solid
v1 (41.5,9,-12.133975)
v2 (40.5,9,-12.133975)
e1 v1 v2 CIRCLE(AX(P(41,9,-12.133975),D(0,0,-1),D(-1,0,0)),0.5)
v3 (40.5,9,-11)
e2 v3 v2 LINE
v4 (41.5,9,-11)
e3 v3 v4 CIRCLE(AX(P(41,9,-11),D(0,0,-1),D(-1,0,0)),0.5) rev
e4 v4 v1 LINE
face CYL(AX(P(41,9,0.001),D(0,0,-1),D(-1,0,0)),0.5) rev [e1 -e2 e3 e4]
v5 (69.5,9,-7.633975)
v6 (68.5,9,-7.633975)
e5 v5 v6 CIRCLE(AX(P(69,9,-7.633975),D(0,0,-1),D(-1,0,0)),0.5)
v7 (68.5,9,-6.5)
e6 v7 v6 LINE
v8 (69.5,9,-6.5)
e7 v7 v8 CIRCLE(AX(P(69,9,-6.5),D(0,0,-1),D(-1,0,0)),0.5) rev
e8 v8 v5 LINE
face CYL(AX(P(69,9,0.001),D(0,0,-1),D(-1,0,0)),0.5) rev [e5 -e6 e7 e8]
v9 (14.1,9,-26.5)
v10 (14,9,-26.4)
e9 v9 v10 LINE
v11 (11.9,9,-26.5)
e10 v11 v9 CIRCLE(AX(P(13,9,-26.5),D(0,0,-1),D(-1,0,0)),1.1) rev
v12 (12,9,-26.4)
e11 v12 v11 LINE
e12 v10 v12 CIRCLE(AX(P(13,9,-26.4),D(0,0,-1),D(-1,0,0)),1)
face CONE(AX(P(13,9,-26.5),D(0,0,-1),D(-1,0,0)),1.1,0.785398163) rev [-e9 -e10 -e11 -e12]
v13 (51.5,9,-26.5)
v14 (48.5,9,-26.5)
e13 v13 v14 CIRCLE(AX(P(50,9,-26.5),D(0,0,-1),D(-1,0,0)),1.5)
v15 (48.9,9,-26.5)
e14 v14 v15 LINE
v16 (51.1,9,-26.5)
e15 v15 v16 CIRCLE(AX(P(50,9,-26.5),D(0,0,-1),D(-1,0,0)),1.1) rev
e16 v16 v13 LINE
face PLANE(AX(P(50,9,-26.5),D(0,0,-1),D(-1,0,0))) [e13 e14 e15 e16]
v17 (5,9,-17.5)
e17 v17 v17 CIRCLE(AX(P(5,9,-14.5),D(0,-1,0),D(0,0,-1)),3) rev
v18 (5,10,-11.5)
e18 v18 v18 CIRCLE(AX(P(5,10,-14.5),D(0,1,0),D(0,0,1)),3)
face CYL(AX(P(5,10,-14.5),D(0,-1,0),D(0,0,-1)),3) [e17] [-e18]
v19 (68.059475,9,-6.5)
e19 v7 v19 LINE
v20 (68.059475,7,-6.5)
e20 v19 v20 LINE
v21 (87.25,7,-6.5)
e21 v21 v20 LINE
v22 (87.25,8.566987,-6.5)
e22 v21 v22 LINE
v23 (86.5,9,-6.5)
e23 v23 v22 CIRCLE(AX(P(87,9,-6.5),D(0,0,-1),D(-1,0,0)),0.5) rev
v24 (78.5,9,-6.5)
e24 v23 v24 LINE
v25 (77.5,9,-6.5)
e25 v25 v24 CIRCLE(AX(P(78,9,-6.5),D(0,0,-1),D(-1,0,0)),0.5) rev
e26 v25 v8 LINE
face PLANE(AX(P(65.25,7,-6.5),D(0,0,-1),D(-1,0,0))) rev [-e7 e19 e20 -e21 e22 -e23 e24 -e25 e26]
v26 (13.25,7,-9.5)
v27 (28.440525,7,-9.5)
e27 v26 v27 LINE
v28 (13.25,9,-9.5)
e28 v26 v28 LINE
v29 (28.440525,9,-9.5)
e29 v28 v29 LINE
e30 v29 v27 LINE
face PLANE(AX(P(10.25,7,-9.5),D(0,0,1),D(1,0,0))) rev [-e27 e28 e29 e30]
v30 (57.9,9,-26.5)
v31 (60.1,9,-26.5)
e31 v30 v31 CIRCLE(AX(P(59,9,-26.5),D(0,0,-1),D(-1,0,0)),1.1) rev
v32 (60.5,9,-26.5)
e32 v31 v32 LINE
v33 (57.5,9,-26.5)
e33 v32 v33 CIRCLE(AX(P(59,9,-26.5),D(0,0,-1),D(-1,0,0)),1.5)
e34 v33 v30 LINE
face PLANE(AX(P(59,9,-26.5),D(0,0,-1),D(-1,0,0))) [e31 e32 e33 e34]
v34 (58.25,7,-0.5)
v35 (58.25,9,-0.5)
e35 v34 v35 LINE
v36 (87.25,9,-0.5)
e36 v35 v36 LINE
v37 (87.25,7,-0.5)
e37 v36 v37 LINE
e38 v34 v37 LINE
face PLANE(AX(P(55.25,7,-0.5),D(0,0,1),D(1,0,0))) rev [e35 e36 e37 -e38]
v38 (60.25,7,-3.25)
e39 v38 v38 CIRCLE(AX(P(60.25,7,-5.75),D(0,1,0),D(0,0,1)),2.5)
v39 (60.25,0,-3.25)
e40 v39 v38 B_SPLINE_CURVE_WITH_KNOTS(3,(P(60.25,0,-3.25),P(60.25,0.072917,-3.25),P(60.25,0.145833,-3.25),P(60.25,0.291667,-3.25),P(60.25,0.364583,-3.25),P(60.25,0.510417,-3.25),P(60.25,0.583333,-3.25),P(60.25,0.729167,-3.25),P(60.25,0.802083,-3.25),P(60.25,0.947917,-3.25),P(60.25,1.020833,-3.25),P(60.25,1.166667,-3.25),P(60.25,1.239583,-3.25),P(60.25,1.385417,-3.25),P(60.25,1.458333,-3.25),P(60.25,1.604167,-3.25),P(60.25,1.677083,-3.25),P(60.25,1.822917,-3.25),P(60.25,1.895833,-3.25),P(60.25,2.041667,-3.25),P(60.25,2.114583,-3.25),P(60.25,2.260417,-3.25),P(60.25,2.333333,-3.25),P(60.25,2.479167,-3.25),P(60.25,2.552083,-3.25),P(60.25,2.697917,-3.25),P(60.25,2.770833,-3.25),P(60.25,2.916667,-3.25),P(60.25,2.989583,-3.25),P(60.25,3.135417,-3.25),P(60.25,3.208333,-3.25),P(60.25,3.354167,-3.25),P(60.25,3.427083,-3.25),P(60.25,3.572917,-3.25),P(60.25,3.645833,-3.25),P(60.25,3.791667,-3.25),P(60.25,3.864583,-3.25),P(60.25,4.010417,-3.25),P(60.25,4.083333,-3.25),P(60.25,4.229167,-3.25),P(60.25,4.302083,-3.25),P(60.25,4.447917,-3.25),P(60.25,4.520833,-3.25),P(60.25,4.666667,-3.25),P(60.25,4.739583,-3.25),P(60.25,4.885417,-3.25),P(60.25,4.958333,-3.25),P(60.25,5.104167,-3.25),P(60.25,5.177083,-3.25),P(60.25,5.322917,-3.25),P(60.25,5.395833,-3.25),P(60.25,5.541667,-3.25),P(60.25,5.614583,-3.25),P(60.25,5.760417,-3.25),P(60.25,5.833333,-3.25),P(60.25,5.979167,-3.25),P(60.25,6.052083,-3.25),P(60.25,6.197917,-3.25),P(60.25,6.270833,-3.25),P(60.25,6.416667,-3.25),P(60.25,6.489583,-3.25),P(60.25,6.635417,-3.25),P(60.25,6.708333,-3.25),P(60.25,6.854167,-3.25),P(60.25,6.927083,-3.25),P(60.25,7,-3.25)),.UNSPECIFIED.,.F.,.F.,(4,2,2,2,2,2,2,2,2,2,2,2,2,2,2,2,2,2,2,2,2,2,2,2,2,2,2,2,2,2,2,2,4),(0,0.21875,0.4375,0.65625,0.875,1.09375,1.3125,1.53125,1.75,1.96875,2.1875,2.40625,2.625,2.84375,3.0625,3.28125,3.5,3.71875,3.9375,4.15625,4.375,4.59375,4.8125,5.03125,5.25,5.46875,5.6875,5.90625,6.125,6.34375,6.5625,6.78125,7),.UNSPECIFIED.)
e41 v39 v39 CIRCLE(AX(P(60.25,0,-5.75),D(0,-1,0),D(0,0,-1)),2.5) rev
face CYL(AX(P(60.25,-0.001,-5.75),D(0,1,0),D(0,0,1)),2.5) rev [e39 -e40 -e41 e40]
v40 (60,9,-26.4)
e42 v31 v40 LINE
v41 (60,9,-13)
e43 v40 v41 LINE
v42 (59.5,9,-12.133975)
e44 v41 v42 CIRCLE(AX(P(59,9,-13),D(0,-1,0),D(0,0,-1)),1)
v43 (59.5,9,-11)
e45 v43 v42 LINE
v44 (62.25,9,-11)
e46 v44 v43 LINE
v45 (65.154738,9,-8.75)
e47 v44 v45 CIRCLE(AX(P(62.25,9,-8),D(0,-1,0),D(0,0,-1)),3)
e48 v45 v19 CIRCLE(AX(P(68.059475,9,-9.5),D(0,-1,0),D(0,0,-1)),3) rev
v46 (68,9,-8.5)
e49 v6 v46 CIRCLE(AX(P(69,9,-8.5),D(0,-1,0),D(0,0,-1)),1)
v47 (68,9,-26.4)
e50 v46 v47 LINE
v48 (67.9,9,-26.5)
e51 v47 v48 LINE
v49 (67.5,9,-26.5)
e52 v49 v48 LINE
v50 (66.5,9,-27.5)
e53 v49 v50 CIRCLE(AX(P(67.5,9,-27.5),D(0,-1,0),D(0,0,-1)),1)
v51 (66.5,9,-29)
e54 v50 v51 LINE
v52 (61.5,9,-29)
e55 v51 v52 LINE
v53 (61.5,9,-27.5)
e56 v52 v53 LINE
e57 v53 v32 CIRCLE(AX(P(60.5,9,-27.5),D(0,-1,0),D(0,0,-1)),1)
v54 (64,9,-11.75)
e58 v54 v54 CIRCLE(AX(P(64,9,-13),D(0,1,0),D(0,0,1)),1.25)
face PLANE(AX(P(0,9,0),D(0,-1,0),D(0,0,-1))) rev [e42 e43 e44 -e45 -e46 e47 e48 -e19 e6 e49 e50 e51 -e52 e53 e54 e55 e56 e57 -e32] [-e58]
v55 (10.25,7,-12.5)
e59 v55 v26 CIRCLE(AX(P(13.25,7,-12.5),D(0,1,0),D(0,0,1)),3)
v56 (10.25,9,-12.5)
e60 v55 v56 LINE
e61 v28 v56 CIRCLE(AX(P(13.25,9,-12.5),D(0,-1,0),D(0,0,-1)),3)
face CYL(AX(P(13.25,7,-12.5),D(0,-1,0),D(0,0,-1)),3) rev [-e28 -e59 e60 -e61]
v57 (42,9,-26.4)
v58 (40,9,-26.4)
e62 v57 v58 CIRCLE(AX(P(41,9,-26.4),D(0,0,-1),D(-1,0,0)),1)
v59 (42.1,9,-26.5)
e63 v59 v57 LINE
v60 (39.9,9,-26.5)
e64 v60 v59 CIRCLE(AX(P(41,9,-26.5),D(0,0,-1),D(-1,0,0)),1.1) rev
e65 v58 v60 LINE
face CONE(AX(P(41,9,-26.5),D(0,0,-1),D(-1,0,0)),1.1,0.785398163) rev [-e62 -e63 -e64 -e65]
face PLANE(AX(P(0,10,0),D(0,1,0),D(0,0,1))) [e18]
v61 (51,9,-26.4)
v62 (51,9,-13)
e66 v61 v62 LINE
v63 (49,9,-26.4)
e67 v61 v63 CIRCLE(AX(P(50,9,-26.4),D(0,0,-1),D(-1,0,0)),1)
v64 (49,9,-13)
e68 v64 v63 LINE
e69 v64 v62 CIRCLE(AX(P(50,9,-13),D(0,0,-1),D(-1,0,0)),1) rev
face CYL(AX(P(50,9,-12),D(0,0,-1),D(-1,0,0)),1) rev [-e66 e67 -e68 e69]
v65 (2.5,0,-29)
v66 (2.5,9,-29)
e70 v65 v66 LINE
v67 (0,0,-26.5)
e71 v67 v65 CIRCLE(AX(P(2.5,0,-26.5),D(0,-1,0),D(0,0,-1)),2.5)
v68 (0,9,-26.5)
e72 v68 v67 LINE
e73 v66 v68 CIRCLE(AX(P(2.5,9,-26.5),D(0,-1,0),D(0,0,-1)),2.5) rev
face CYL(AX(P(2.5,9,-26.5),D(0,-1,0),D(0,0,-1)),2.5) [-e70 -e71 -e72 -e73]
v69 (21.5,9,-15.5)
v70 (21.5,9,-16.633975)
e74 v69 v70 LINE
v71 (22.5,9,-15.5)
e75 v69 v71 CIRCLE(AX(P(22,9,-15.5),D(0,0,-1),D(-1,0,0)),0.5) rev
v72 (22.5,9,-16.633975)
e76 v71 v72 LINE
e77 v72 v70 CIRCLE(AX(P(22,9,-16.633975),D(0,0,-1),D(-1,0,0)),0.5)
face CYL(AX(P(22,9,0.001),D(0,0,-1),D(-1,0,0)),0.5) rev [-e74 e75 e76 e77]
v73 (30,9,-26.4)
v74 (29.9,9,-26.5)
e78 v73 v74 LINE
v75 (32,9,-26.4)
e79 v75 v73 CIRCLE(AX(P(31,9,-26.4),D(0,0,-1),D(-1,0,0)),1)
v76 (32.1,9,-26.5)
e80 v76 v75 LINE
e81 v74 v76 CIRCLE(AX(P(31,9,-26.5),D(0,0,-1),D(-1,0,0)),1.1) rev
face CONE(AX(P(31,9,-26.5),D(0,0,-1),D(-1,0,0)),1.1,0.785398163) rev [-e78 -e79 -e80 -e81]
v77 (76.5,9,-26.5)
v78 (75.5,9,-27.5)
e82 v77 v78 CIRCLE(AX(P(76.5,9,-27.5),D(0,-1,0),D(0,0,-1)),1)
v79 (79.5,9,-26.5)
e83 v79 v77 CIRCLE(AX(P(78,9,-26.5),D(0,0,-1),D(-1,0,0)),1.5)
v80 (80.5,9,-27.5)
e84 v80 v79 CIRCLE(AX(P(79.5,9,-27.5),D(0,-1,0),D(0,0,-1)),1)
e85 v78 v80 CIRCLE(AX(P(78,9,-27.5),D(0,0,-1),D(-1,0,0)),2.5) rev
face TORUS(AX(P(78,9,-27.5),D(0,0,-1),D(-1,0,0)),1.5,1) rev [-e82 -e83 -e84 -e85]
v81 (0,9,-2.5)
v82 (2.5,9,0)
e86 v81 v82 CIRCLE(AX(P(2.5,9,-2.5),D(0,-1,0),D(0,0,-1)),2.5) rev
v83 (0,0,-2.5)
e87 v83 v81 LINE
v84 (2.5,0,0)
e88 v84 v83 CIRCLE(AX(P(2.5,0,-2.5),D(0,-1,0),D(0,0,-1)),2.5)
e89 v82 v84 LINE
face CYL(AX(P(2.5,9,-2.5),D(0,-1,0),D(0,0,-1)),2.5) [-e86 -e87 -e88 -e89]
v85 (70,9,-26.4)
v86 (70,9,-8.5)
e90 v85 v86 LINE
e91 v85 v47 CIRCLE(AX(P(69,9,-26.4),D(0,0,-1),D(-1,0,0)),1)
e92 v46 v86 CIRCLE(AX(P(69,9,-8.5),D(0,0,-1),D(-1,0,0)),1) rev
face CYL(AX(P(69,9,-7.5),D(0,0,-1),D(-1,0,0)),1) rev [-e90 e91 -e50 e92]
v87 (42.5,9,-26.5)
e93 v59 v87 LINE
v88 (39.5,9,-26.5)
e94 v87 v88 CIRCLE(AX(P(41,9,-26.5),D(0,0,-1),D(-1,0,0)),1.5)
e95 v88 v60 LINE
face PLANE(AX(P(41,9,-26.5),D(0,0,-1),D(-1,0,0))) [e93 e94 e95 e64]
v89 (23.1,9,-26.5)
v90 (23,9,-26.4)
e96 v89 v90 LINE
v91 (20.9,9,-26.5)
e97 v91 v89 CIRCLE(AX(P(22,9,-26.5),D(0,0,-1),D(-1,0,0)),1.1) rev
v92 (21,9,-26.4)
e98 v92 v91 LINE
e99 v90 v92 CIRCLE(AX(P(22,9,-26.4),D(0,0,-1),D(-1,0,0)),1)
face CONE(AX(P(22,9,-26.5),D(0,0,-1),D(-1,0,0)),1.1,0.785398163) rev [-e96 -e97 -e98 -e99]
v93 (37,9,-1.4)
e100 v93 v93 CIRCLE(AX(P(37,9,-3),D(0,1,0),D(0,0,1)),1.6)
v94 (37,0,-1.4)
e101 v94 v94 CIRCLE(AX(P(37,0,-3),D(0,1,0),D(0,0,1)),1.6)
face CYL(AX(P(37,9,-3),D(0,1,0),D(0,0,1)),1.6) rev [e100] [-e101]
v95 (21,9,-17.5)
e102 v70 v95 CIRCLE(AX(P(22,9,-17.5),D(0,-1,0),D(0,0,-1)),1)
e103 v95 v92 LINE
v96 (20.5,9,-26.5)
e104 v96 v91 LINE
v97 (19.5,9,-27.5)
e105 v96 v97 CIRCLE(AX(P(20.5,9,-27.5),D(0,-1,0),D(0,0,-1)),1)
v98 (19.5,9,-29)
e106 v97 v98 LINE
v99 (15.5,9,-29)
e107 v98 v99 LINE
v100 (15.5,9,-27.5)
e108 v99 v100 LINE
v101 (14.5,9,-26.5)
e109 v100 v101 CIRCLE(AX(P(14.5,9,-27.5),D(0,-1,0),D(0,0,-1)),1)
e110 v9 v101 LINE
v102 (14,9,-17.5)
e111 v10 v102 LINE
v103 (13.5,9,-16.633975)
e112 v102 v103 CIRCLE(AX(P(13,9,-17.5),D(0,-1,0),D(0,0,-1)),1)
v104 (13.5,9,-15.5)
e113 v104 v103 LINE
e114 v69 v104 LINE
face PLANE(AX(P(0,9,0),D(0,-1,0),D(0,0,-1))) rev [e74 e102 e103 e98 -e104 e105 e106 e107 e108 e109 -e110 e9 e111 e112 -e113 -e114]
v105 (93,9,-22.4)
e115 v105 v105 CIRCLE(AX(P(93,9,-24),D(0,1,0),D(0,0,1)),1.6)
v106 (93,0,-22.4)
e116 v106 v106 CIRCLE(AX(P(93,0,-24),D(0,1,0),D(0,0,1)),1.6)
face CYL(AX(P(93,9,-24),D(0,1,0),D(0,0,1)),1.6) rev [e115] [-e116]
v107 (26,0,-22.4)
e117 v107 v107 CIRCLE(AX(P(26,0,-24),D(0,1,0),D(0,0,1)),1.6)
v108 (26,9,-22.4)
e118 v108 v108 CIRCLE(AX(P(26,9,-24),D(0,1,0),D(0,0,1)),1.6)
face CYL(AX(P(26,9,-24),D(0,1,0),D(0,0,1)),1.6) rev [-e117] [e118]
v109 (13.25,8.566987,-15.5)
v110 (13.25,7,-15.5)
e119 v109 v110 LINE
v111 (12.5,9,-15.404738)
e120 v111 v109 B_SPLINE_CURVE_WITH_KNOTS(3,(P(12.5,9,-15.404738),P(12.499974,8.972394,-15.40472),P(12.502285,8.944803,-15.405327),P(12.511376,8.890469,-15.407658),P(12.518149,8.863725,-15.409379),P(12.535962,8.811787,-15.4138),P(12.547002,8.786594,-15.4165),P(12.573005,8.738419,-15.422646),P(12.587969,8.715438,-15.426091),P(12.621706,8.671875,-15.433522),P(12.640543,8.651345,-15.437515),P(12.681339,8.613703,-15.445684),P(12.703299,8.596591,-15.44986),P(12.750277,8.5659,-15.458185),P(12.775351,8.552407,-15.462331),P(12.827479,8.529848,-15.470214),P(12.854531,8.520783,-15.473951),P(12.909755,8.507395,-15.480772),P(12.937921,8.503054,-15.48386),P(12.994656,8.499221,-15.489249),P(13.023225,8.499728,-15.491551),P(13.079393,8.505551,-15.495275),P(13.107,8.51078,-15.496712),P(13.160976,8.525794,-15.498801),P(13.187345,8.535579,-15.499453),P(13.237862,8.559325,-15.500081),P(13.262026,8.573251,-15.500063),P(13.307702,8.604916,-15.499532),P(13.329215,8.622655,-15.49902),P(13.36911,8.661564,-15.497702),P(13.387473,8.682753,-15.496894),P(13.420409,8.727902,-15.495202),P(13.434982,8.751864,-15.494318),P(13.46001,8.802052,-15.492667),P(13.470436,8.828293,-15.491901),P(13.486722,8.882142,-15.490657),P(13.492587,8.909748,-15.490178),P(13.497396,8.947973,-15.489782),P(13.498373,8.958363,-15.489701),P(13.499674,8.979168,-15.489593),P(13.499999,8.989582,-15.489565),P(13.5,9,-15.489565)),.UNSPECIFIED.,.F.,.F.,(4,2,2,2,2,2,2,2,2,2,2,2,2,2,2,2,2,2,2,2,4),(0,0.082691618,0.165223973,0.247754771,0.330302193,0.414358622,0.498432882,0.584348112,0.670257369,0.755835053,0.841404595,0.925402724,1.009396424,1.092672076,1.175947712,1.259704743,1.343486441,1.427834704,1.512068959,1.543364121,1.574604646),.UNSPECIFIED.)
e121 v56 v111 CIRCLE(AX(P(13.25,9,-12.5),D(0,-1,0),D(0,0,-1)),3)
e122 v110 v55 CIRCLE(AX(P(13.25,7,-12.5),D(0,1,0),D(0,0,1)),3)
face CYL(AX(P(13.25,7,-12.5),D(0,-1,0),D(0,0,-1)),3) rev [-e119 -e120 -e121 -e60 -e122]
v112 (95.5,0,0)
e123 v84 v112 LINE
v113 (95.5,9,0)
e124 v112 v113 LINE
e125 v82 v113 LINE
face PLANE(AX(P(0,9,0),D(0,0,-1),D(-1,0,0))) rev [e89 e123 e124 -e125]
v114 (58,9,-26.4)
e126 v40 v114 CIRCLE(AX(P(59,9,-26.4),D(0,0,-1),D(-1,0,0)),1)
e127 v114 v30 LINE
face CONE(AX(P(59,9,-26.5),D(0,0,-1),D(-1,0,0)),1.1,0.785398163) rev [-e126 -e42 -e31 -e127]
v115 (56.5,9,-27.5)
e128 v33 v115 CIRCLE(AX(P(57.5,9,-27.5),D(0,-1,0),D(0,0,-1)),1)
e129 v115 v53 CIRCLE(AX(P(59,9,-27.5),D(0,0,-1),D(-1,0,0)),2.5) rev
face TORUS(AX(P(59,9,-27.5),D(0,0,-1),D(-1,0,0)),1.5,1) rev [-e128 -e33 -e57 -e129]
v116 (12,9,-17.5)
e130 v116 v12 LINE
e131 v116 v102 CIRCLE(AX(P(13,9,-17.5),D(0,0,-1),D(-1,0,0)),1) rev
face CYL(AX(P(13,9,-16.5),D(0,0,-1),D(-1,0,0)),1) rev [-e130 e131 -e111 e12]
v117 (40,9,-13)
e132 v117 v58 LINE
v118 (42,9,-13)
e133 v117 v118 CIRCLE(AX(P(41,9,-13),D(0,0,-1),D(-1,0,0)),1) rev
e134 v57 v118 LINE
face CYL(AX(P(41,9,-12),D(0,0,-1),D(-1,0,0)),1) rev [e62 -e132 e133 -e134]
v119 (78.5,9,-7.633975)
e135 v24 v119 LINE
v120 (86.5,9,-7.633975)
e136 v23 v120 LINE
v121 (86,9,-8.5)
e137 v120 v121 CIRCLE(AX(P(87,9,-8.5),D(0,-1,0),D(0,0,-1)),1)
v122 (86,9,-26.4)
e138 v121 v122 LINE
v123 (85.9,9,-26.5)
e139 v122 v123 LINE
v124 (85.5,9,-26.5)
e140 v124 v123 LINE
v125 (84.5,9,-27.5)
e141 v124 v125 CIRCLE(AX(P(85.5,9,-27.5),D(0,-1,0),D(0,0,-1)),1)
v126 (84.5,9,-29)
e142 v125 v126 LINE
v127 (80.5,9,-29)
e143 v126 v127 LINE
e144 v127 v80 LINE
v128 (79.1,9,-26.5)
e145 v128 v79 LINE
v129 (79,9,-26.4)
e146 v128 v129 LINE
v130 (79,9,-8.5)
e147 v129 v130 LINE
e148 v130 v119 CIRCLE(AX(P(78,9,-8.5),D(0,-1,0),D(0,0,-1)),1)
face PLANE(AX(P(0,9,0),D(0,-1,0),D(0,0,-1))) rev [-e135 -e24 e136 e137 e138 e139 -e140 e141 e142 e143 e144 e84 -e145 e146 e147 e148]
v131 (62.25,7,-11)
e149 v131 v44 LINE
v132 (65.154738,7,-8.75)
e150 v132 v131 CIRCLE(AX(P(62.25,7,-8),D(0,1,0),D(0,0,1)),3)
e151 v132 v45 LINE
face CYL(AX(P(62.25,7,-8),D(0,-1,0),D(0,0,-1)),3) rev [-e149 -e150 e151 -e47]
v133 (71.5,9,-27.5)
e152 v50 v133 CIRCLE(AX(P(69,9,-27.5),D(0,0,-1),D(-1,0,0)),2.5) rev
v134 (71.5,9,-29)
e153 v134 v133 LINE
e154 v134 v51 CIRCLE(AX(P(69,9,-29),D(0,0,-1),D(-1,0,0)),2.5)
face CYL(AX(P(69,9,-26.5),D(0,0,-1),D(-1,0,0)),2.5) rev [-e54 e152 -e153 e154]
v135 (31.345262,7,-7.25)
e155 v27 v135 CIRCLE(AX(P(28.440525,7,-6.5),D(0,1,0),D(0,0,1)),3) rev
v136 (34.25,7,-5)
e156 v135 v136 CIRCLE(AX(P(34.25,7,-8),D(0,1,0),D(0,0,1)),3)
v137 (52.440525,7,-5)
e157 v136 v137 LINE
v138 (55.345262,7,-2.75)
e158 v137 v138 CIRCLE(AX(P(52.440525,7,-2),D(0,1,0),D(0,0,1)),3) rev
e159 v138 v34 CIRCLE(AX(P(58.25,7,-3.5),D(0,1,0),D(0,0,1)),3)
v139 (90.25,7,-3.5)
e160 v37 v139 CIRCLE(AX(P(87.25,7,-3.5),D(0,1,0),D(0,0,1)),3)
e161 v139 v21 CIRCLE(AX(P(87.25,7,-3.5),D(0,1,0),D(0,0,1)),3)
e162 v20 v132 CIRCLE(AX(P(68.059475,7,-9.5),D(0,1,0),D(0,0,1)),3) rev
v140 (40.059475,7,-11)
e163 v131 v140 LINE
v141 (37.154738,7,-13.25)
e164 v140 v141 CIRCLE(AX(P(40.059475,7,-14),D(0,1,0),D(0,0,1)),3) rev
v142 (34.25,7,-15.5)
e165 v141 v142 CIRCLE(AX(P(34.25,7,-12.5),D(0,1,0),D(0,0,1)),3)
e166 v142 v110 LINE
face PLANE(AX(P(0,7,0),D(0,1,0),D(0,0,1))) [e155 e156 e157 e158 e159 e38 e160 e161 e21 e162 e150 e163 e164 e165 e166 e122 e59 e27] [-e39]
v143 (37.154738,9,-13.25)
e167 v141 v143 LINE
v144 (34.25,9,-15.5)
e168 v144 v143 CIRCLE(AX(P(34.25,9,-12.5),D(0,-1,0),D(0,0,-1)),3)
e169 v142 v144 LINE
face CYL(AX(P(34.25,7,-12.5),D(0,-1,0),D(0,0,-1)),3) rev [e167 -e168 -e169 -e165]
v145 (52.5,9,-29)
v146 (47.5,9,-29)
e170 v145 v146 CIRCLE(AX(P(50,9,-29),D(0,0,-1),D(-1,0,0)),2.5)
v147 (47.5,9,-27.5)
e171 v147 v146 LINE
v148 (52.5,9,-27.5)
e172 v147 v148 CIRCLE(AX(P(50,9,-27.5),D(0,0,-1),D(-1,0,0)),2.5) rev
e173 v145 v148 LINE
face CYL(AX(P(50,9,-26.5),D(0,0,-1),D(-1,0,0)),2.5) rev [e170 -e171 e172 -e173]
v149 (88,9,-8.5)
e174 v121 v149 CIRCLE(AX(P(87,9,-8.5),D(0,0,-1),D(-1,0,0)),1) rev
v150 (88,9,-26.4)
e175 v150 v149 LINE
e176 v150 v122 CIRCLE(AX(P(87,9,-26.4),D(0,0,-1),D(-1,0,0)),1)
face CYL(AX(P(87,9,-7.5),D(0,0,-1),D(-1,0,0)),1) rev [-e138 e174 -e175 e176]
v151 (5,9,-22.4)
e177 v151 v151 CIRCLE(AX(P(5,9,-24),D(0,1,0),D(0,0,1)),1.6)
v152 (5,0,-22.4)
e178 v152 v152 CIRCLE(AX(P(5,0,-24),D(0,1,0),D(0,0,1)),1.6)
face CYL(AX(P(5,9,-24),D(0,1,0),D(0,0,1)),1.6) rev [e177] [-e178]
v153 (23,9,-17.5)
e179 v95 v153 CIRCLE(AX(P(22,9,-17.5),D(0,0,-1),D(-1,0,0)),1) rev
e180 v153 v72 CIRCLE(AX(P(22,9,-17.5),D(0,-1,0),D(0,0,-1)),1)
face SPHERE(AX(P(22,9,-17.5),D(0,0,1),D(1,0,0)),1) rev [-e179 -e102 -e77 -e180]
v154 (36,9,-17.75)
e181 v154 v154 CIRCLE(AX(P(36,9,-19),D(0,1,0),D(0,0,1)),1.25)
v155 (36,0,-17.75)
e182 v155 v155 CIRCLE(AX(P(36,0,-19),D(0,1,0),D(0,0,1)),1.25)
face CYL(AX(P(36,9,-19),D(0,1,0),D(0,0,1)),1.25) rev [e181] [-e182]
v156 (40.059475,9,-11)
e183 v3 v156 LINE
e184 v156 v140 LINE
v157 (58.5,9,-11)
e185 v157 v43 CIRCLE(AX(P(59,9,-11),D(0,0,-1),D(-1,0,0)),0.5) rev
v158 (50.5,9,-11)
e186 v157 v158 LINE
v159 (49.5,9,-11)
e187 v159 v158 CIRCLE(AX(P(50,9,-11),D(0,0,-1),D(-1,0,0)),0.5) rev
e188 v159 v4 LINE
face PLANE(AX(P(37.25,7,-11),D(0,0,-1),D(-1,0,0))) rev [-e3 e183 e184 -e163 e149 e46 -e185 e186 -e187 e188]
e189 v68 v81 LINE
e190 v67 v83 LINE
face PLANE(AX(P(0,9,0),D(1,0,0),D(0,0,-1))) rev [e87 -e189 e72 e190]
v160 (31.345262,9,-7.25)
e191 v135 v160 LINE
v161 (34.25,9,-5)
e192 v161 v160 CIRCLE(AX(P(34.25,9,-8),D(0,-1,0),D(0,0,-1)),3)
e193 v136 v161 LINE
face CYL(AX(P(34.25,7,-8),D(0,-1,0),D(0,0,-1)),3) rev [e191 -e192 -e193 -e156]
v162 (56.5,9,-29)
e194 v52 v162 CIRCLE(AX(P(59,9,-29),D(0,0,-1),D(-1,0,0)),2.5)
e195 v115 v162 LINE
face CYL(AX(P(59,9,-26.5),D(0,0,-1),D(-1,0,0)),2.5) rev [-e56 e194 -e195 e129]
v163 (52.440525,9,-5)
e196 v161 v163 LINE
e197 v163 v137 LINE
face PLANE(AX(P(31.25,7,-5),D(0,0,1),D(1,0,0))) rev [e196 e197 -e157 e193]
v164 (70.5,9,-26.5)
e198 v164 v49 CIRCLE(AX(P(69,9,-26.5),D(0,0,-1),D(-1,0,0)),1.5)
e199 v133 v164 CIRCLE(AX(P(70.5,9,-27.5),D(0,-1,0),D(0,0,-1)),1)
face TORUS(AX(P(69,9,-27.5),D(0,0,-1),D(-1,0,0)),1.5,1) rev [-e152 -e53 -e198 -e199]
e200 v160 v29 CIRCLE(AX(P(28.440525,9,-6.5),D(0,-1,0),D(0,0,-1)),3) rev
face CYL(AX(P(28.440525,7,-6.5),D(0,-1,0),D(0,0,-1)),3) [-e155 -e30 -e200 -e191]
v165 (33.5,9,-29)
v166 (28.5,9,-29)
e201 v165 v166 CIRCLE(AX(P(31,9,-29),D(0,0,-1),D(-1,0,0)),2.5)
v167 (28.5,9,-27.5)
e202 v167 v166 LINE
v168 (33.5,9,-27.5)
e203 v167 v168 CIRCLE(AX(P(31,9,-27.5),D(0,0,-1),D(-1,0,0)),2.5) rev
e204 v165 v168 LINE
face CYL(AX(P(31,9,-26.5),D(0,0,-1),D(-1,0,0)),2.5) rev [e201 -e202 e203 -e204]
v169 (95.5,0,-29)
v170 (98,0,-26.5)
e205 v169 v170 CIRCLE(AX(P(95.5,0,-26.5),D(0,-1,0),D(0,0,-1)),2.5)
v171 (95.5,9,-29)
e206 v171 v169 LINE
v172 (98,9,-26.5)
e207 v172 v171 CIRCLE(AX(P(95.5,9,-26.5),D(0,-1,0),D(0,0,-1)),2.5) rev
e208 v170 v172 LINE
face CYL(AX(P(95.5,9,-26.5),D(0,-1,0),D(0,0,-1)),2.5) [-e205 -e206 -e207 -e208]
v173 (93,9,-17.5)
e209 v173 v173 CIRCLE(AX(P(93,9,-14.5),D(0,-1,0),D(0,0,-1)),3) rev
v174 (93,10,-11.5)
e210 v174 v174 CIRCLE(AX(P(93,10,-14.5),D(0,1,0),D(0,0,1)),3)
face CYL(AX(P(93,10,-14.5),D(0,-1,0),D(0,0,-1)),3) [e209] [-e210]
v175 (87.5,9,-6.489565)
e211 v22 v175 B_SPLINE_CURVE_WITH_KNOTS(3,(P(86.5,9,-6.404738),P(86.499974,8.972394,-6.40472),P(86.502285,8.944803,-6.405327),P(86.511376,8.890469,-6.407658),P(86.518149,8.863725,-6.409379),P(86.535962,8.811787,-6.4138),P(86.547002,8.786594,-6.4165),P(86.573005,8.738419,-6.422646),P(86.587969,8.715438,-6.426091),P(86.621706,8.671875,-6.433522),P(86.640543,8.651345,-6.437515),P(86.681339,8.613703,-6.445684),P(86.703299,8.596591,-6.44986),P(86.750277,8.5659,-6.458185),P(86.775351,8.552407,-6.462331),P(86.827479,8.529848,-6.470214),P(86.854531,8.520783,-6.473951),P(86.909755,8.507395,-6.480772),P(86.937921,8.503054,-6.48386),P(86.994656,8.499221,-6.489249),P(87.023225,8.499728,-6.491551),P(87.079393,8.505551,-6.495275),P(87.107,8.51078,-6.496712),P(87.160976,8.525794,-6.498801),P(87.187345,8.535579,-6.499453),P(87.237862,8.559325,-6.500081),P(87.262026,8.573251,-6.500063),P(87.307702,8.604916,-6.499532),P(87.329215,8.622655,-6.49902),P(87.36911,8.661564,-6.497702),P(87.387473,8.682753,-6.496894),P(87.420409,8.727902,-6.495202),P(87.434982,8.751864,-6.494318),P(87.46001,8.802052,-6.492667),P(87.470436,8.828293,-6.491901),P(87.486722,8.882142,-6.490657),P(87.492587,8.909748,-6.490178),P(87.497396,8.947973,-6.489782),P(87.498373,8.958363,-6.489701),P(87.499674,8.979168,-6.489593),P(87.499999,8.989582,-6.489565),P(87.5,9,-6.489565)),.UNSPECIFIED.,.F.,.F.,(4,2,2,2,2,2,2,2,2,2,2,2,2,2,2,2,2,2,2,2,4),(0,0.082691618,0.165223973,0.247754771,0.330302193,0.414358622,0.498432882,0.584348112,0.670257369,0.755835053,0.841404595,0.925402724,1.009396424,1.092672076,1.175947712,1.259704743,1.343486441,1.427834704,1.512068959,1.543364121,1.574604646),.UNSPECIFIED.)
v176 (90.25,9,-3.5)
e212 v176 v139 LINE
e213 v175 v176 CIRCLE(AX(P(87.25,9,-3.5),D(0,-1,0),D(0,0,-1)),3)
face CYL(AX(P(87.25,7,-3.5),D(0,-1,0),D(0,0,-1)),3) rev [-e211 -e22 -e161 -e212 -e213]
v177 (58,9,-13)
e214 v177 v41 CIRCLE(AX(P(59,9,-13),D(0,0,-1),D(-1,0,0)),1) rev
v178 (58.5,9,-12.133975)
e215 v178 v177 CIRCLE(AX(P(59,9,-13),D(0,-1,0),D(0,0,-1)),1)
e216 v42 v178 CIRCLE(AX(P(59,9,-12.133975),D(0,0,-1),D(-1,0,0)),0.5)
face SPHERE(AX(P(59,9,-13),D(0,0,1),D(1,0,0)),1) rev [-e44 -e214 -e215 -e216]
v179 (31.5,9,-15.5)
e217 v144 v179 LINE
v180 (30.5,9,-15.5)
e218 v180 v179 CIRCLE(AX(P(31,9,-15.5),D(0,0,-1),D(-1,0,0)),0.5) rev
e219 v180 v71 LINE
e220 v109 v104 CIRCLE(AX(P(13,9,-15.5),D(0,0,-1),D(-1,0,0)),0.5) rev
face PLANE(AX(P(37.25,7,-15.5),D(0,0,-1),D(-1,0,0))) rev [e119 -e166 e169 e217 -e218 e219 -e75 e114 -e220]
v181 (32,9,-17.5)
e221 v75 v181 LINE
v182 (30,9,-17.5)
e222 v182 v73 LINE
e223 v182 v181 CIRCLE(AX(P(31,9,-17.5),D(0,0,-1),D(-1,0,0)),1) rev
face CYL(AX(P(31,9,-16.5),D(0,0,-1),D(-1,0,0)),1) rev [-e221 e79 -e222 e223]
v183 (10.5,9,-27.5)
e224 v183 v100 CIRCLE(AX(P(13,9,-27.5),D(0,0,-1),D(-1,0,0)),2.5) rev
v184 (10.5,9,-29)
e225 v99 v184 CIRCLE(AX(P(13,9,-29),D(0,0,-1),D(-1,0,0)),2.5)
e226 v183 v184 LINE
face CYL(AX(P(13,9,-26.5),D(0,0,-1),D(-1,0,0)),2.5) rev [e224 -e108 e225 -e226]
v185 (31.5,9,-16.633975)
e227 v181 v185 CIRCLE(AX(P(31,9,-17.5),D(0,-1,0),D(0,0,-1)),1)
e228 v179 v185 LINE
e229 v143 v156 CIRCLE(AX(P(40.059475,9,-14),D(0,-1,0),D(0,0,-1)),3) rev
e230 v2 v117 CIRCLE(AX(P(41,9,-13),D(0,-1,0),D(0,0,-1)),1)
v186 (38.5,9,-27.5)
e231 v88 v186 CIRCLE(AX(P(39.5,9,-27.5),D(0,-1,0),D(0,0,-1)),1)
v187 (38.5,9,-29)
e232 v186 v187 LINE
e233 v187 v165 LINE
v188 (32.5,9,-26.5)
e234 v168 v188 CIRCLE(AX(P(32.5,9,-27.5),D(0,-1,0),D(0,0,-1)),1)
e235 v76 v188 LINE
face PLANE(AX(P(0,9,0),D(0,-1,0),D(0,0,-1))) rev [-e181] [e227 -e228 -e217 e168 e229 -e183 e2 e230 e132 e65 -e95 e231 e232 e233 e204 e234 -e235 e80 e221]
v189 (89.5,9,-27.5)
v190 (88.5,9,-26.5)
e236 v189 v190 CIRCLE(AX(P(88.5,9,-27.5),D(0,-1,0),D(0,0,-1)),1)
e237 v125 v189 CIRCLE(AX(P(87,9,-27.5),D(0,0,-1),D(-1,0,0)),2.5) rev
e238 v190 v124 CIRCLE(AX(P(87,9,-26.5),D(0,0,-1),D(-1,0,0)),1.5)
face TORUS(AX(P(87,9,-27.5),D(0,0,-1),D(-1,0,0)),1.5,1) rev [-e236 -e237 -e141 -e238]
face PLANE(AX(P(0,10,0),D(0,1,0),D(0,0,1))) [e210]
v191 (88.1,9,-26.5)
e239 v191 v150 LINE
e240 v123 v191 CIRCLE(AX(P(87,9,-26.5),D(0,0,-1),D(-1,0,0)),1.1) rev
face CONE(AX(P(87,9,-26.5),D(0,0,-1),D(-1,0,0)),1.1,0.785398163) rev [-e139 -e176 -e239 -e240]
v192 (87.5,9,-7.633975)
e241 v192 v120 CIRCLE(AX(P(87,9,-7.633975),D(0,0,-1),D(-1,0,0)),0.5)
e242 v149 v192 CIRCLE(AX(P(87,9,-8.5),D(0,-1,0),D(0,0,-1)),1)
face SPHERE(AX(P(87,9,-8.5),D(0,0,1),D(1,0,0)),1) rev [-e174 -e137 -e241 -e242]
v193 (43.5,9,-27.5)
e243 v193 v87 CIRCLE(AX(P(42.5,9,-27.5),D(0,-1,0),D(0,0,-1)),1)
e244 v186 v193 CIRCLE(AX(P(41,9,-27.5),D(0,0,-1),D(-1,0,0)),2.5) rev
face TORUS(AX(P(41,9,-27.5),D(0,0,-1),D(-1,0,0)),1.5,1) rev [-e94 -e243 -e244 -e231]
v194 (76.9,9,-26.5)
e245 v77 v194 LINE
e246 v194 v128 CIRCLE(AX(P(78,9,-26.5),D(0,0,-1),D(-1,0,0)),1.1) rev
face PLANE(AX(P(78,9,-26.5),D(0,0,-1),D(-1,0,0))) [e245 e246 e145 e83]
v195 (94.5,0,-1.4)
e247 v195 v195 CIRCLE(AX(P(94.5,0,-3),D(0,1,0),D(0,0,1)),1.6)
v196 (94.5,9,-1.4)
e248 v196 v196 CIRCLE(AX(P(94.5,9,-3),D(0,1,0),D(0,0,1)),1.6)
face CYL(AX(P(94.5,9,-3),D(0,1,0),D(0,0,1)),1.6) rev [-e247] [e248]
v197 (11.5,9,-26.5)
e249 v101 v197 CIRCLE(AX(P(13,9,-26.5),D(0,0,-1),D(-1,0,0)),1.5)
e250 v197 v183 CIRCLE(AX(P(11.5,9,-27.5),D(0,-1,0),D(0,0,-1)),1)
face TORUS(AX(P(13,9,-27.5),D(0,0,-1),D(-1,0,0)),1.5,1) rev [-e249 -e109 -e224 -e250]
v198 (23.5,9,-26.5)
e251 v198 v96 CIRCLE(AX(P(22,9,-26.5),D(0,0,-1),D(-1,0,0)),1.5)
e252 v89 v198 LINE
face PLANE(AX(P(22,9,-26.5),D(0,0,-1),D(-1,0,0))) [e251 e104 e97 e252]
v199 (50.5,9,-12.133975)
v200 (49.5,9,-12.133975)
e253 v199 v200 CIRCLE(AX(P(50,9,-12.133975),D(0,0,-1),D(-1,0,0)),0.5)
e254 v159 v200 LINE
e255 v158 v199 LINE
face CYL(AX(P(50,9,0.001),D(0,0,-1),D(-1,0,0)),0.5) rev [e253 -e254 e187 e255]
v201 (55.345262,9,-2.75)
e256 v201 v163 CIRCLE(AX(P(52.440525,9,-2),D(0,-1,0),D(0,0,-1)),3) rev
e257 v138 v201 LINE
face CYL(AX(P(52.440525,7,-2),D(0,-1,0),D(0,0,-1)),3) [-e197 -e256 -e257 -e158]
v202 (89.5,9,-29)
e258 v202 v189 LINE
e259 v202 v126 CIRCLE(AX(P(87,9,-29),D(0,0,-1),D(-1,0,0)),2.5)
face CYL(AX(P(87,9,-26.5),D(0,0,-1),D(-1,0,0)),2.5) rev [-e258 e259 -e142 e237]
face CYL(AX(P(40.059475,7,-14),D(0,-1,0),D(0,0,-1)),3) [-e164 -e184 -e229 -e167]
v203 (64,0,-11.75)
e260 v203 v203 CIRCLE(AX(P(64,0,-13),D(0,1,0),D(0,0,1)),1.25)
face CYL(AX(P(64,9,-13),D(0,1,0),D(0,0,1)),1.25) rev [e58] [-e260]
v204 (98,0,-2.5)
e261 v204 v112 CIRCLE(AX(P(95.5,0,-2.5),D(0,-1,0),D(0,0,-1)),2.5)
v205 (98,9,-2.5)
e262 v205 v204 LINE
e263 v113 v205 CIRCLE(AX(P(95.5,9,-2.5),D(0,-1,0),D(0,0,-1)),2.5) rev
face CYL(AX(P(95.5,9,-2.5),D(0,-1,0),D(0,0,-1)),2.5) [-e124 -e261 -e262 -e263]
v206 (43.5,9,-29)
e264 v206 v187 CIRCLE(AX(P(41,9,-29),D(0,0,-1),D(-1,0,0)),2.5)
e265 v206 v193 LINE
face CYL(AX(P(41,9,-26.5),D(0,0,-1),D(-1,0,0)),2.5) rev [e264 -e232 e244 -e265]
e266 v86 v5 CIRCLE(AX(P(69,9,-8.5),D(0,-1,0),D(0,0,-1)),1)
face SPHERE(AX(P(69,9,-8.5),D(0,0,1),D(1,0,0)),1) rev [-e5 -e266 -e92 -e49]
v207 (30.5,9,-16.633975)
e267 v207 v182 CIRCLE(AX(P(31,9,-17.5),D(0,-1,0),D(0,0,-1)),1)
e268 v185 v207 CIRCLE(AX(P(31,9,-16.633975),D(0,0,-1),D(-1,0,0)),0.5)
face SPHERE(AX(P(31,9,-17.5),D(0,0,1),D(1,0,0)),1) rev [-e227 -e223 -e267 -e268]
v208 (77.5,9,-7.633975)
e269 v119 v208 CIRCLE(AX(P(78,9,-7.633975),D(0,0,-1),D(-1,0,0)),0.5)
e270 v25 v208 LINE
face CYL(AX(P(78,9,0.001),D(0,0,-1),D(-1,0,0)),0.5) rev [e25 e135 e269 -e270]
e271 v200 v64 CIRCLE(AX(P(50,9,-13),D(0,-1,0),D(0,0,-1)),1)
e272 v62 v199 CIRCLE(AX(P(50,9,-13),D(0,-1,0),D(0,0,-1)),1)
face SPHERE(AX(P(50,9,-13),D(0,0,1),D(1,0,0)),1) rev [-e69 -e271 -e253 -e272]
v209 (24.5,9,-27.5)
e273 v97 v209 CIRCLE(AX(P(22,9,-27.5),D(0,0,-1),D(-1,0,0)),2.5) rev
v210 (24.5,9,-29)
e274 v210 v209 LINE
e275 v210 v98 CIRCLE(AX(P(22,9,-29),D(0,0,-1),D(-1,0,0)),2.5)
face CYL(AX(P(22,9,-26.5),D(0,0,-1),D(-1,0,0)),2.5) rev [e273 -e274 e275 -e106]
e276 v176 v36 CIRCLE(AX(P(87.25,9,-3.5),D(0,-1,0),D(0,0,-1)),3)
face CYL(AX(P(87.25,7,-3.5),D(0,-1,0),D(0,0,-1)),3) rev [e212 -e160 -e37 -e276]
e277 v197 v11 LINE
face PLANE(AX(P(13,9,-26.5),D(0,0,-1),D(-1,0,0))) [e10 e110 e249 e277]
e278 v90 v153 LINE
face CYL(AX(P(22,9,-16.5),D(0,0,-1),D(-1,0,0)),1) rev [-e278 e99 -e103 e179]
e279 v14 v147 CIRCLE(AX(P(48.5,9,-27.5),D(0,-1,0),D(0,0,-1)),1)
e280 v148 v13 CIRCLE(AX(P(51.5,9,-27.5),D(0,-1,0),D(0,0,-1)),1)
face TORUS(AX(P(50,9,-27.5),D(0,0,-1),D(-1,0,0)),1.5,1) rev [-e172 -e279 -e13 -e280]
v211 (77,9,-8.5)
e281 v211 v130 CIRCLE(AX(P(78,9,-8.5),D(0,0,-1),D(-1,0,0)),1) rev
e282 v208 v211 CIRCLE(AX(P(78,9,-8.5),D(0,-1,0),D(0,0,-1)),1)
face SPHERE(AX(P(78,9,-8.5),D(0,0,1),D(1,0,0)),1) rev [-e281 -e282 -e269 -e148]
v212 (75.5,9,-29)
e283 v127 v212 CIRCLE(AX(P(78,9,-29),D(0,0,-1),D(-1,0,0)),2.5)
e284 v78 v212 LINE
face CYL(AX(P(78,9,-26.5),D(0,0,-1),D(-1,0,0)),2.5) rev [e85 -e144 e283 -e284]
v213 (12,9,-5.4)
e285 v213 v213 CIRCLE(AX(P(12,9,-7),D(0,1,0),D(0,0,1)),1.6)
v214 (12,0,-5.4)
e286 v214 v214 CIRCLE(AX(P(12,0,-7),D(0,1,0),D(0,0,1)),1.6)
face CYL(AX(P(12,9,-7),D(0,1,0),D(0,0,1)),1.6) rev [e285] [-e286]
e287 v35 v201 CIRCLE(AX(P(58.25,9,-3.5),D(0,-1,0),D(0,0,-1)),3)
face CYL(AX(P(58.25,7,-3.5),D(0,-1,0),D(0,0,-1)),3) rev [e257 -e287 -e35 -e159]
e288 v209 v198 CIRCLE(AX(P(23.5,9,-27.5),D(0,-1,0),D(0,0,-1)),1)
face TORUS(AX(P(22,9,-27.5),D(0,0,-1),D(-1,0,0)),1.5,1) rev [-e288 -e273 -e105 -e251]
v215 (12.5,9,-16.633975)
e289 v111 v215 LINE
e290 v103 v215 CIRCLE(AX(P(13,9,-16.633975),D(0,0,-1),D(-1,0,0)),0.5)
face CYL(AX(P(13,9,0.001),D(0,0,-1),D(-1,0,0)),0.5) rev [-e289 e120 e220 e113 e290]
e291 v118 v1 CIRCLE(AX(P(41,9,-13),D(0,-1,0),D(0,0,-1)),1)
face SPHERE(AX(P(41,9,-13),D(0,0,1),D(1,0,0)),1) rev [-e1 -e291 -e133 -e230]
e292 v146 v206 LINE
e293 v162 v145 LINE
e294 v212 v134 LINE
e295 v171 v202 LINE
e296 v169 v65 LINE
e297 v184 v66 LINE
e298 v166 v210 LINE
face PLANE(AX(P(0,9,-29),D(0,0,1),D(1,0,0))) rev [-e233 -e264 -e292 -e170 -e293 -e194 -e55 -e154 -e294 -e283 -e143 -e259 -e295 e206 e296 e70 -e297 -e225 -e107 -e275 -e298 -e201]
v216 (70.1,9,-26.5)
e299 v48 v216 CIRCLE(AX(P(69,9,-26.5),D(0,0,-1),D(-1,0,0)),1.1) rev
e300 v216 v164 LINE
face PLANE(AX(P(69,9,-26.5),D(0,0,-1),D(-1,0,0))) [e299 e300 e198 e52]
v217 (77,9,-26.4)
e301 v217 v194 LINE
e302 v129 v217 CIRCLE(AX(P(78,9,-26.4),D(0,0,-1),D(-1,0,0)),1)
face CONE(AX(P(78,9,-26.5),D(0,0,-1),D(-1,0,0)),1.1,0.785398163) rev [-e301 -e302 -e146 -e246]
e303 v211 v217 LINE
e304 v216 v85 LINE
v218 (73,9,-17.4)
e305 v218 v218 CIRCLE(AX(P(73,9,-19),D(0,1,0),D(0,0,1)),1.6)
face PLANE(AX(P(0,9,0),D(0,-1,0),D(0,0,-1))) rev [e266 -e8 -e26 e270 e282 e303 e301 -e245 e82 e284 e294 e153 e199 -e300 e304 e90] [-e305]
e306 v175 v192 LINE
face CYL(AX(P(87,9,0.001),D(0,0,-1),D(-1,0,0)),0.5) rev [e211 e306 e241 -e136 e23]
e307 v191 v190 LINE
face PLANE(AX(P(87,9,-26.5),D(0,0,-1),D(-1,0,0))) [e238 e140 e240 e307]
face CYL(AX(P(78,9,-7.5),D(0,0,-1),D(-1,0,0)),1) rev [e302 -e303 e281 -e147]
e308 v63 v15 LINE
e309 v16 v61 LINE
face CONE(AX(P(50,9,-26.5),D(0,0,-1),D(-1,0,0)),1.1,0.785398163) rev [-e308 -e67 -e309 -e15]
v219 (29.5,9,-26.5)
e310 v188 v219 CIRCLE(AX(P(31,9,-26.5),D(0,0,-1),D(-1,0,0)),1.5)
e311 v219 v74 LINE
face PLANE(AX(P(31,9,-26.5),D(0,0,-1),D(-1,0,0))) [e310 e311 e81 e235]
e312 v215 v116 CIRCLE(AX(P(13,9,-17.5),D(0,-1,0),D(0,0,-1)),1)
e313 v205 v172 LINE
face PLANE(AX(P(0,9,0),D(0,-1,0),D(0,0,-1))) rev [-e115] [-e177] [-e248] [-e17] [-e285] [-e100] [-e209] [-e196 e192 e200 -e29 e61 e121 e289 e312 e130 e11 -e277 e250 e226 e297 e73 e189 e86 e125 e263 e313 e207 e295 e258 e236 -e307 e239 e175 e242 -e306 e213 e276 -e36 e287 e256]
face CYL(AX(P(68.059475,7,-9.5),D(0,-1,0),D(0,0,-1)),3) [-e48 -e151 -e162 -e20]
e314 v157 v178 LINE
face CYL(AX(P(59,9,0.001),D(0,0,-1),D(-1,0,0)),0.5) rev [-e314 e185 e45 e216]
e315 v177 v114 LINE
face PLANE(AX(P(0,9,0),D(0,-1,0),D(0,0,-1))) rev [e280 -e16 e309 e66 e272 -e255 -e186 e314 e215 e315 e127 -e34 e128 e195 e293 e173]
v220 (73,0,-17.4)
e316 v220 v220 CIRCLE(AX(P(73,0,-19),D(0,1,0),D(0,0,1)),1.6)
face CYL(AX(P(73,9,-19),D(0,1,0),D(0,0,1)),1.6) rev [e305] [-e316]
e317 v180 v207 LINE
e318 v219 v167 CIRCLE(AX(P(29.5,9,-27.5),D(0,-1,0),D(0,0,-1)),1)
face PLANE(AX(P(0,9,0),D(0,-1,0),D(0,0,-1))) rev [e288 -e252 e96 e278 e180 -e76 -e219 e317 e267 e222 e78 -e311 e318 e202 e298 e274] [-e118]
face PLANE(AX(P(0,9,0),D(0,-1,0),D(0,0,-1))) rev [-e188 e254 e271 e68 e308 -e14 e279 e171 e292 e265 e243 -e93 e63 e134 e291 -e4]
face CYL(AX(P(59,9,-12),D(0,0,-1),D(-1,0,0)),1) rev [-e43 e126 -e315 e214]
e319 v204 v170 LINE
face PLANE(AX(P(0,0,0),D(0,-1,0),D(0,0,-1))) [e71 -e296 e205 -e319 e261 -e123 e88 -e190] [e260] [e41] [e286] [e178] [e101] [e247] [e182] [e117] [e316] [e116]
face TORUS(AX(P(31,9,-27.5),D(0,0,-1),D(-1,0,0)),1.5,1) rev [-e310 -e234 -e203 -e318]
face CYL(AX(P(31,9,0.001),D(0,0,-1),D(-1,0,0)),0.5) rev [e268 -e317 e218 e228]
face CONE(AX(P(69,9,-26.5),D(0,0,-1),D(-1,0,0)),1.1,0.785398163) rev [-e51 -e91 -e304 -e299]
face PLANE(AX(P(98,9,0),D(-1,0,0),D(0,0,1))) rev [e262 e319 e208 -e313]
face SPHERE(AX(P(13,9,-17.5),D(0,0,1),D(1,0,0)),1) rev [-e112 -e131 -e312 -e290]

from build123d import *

# Parameters (mm, degrees)
SKIZZE1_W                       = 98
SKIZZE1_H                       = 29
AUFSATZ_LINEAR_AUSTRAGEN1_DEPTH = 9
SKIZZE2_R                       = 1
SCHNITT_LINEAR_AUSTRAGEN1_DEPTH = 12.5
VERRUNDUNG5_R                   = 2.5
SKIZZE2_4_R                     = 1
SCHNITT_LINEAR_AUSTRAGEN2_DEPTH = 17
SKIZZE2_5_R                     = 1
SCHNITT_LINEAR_AUSTRAGEN3_DEPTH = 21.5
SKIZZE4_R                       = 2.5
SCHNITT_LINEAR_AUSTRAGEN4_DEPTH = 2.5
VERRUNDUNG1_R                   = 1
FASE1_SIZE                      = 0.1
SCHNITT_LINEAR_AUSTRAGEN5_DEPTH = 0.25
SCHNITT_LINEAR_AUSTRAGEN6_DEPTH = 2
SCHNITT_LINEAR_AUSTRAGEN7_REACH = 104.44
SKIZZE7_R                       = 2.5
VERRUNDUNG2_R                   = 3
VERRUNDUNG6_R                   = 3
SCHNITT_LINEAR_AUSTRAGEN8_REACH = 104.596
DURCHGANGSLOCH_F_R_M31_D        = 3.2
M3_GEWINDEBOHRUNG1_D            = 2.5
SKIZZE10_R                      = 3
AUFSATZ_LINEAR_AUSTRAGEN2_DEPTH = 1


with BuildPart() as part:
    # Skizze1 → Aufsatz-Linear austragen1 (new body)
    with BuildSketch(Plane(origin=(0, 0, 0), x_dir=(1, 0, 0), z_dir=(0, 1, 0))):
        with Locations((49, 14.5)):
            Rectangle(SKIZZE1_W, SKIZZE1_H)
    extrude(amount=AUFSATZ_LINEAR_AUSTRAGEN1_DEPTH)

    # Skizze2 → Schnitt-Linear austragen1 (cut)
    with BuildSketch(Plane(origin=(0, 0, -29), x_dir=(-1, 0, 0), z_dir=(0, 0, -1))):
        with Locations((-13, 9)):
            Circle(SKIZZE2_R)
        with Locations((-22, 9)):
            Circle(SKIZZE2_R)
        with Locations((-31, 9)):
            Circle(SKIZZE2_R)
    extrude(amount=-SCHNITT_LINEAR_AUSTRAGEN1_DEPTH, mode=Mode.SUBTRACT)

    # Verrundung5
    verrundung5_edges = [part.edges().sort_by_distance(p)[0] for p in [
        (0, 4.5, -29),
        (98, 4.5, -29),
        (98, 4.5, 0),
        (0, 4.5, 0),
    ]]
    fillet(verrundung5_edges, radius=VERRUNDUNG5_R)

    # Skizze2<4> → Schnitt-Linear austragen2 (cut)
    with BuildSketch(Plane(origin=(0, 0, -29), x_dir=(-1, 0, 0), z_dir=(0, 0, -1))):
        with Locations((-41, 9)):
            Circle(SKIZZE2_4_R)
        with Locations((-50, 9)):
            Circle(SKIZZE2_4_R)
        with Locations((-59, 9)):
            Circle(SKIZZE2_4_R)
    extrude(amount=-SCHNITT_LINEAR_AUSTRAGEN2_DEPTH, mode=Mode.SUBTRACT)

    # Skizze2<5> → Schnitt-Linear austragen3 (cut)
    with BuildSketch(Plane(origin=(0, 0, -29), x_dir=(-1, 0, 0), z_dir=(0, 0, -1))):
        with Locations((-69, 9)):
            Circle(SKIZZE2_5_R)
        with Locations((-78, 9)):
            Circle(SKIZZE2_5_R)
        with Locations((-87, 9)):
            Circle(SKIZZE2_5_R)
    extrude(amount=-SCHNITT_LINEAR_AUSTRAGEN3_DEPTH, mode=Mode.SUBTRACT)

    # Skizze4 → Schnitt-Linear austragen4 (cut)
    with BuildSketch(Plane(origin=(0, 0, -29), x_dir=(-1, 0, 0), z_dir=(0, 0, -1))):
        with Locations((-13, 9)):
            Circle(SKIZZE4_R)
        with Locations((-22, 9)):
            Circle(SKIZZE4_R)
        with Locations((-31, 9)):
            Circle(SKIZZE4_R)
        with Locations((-41, 9)):
            Circle(SKIZZE4_R)
        with Locations((-50, 9)):
            Circle(SKIZZE4_R)
        with Locations((-59, 9)):
            Circle(SKIZZE4_R)
        with Locations((-69, 9)):
            Circle(SKIZZE4_R)
        with Locations((-78, 9)):
            Circle(SKIZZE4_R)
        with Locations((-87, 9)):
            Circle(SKIZZE4_R)
    extrude(amount=-SCHNITT_LINEAR_AUSTRAGEN4_DEPTH, mode=Mode.SUBTRACT)

    # Verrundung1
    verrundung1_edges = [part.edges().sort_by_distance(p)[0] for p in [
        (87, 6.5, -26.5),
        (78, 6.5, -26.5),
        (69, 6.5, -26.5),
        (59, 6.5, -26.5),
        (50, 6.5, -26.5),
        (41, 6.5, -26.5),
        (31, 6.5, -26.5),
        (22, 6.5, -26.5),
        (13, 6.5, -26.5),
        (13, 8, -16.5),
        (22, 8, -16.5),
        (31, 8, -16.5),
        (41, 8, -12),
        (50, 8, -12),
        (59, 8, -12),
        (69, 8, -7.5),
        (78, 8, -7.5),
        (87, 8, -7.5),
    ]]
    fillet(verrundung1_edges, radius=VERRUNDUNG1_R - 0.0001)  # a hair under: the kernel refuses the full size

    # Fase1
    fase1_edges = [part.edges().sort_by_distance(p)[0] for p in [
        (13, 8, -26.5),
        (22, 8, -26.5),
        (31, 8, -26.5),
        (41, 8, -26.5),
        (50, 8, -26.5),
        (59, 8, -26.5),
        (69, 8, -26.5),
        (78, 8, -26.5),
        (87, 8, -26.5),
    ]]
    chamfer(fase1_edges, length=FASE1_SIZE)

    # Skizze5 → Schnitt-Linear austragen5 (cut)
    with BuildSketch(Plane(origin=(0, 9, 0), x_dir=(1, 0, 0), z_dir=(0, 1, 0))):
        Polygon((12.75, 15.5), (13, 15.5), (13.25, 15.5), (13.25, 17.5), (12.75, 17.5), align=None)
        Polygon((40.75, 11), (41, 11), (41.25, 11), (41.25, 13), (40.75, 13), align=None)
        Polygon((21.75, 15.5), (22, 15.5), (22.25, 15.5), (22.25, 17.5), (21.75, 17.5), align=None)
        Polygon((68.75, 6.5), (69, 6.5), (69.25, 6.5), (69.25, 8.5), (68.75, 8.5), align=None)
        Polygon((49.75, 11), (50, 11), (50.25, 11), (50.25, 13), (49.75, 13), align=None)
        Polygon((30.75, 15.5), (31, 15.5), (31.25, 15.5), (31.25, 17.5), (30.75, 17.5), align=None)
        Polygon((58.75, 11), (59, 11), (59.25, 11), (59.25, 13), (58.75, 13), align=None)
        Polygon((77.75, 6.5), (78, 6.5), (78.25, 6.5), (78.25, 8.5), (77.75, 8.5), align=None)
        Polygon((86.75, 6.5), (87, 6.5), (87.25, 6.5), (87.25, 8.5), (86.75, 8.5), align=None)
    extrude(amount=-SCHNITT_LINEAR_AUSTRAGEN5_DEPTH, mode=Mode.SUBTRACT)

    # Skizze6 → Schnitt-Linear austragen6 (cut)
    with BuildSketch(Plane(origin=(0, 9, 0), x_dir=(1, 0, 0), z_dir=(0, 1, 0))):
        Polygon((37.25, 15.5), (10.25, 15.5), (10.25, 9.5), (31.25, 9.5), (31.25, 5), (55.25, 5), (55.25, 0.5), (90.25, 0.5), (90.25, 6.5), (65.25, 6.5), (65.25, 11), (37.25, 11), align=None)
    extrude(amount=-SCHNITT_LINEAR_AUSTRAGEN6_DEPTH, mode=Mode.SUBTRACT)

    # Skizze7 → Schnitt-Linear austragen7 (cut, up to next)
    with BuildSketch(Plane(origin=(0, 7, 0), x_dir=(1, 0, 0), z_dir=(0, 1, 0)), mode=Mode.PRIVATE) as schnitt_linear_austragen7_sk1:
        with Locations(Location((60.25, 5.75, 0), (0, 0, 270))):
            Circle(SKIZZE7_R)
    schnitt_linear_austragen7_tool1 = extrude(schnitt_linear_austragen7_sk1.sketch, amount=-SCHNITT_LINEAR_AUSTRAGEN7_REACH, mode=Mode.PRIVATE) & part.part
    add(schnitt_linear_austragen7_tool1.solids().sort_by_distance((60.25, 7, -5.75))[0], mode=Mode.SUBTRACT)

    # Verrundung2
    verrundung2_edges = [part.edges().sort_by_distance(p)[0] for p in [
        (90.25, 8, -0.5),
        (90.25, 8, -6.5),
        (65.25, 8, -11),
        (55.25, 8, -0.5),
        (37.25, 8, -15.5),
        (31.25, 8, -5),
        (10.25, 8, -9.5),
        (10.25, 8, -15.5),
    ]]
    fillet(verrundung2_edges, radius=VERRUNDUNG2_R - 0.0001)  # a hair under: the kernel refuses the full size

    # Verrundung6
    verrundung6_edges = [part.edges().sort_by_distance(p)[0] for p in [
        (65.25, 8, -6.5),
        (55.25, 8, -5),
        (31.25, 8, -9.5),
        (37.25, 8, -11),
    ]]
    fillet(verrundung6_edges, radius=VERRUNDUNG6_R)

    # Skizze15 → Schnitt-Linear austragen8 (cut, up to next)
    with BuildSketch(Plane(origin=(0, 0, -29), x_dir=(-1, 0, 0), z_dir=(0, 0, -1)), mode=Mode.PRIVATE) as schnitt_linear_austragen8_sk1:
        with BuildLine():
            Line((-87.5, 9), (-86.5, 9))
            ThreePointArc((-86.5, 9), (-87, 8.5), (-87.5, 9))
        make_face()
    schnitt_linear_austragen8_tool1 = extrude(schnitt_linear_austragen8_sk1.sketch, amount=-SCHNITT_LINEAR_AUSTRAGEN8_REACH, mode=Mode.PRIVATE) & part.part
    # Skizze15 → Schnitt-Linear austragen8 (cut, up to next)
    with BuildSketch(Plane(origin=(0, 0, -29), x_dir=(-1, 0, 0), z_dir=(0, 0, -1)), mode=Mode.PRIVATE) as schnitt_linear_austragen8_sk2:
        with BuildLine():
            Line((-78.5, 9), (-77.5, 9))
            ThreePointArc((-77.5, 9), (-78, 8.5), (-78.5, 9))
        make_face()
    schnitt_linear_austragen8_tool2 = extrude(schnitt_linear_austragen8_sk2.sketch, amount=-SCHNITT_LINEAR_AUSTRAGEN8_REACH, mode=Mode.PRIVATE) & part.part
    # Skizze15 → Schnitt-Linear austragen8 (cut, up to next)
    with BuildSketch(Plane(origin=(0, 0, -29), x_dir=(-1, 0, 0), z_dir=(0, 0, -1)), mode=Mode.PRIVATE) as schnitt_linear_austragen8_sk3:
        with BuildLine():
            Line((-69.5, 9), (-68.5, 9))
            ThreePointArc((-68.5, 9), (-69, 8.5), (-69.5, 9))
        make_face()
    schnitt_linear_austragen8_tool3 = extrude(schnitt_linear_austragen8_sk3.sketch, amount=-SCHNITT_LINEAR_AUSTRAGEN8_REACH, mode=Mode.PRIVATE) & part.part
    # Skizze15 → Schnitt-Linear austragen8 (cut, up to next)
    with BuildSketch(Plane(origin=(0, 0, -29), x_dir=(-1, 0, 0), z_dir=(0, 0, -1)), mode=Mode.PRIVATE) as schnitt_linear_austragen8_sk4:
        with BuildLine():
            Line((-59.5, 9), (-58.5, 9))
            ThreePointArc((-58.5, 9), (-59, 8.5), (-59.5, 9))
        make_face()
    schnitt_linear_austragen8_tool4 = extrude(schnitt_linear_austragen8_sk4.sketch, amount=-SCHNITT_LINEAR_AUSTRAGEN8_REACH, mode=Mode.PRIVATE) & part.part
    # Skizze15 → Schnitt-Linear austragen8 (cut, up to next)
    with BuildSketch(Plane(origin=(0, 0, -29), x_dir=(-1, 0, 0), z_dir=(0, 0, -1)), mode=Mode.PRIVATE) as schnitt_linear_austragen8_sk5:
        with BuildLine():
            Line((-50.5, 9), (-49.5, 9))
            ThreePointArc((-49.5, 9), (-50, 8.5), (-50.5, 9))
        make_face()
    schnitt_linear_austragen8_tool5 = extrude(schnitt_linear_austragen8_sk5.sketch, amount=-SCHNITT_LINEAR_AUSTRAGEN8_REACH, mode=Mode.PRIVATE) & part.part
    # Skizze15 → Schnitt-Linear austragen8 (cut, up to next)
    with BuildSketch(Plane(origin=(0, 0, -29), x_dir=(-1, 0, 0), z_dir=(0, 0, -1)), mode=Mode.PRIVATE) as schnitt_linear_austragen8_sk6:
        with BuildLine():
            Line((-41.5, 9), (-40.5, 9))
            ThreePointArc((-40.5, 9), (-41, 8.5), (-41.5, 9))
        make_face()
    schnitt_linear_austragen8_tool6 = extrude(schnitt_linear_austragen8_sk6.sketch, amount=-SCHNITT_LINEAR_AUSTRAGEN8_REACH, mode=Mode.PRIVATE) & part.part
    # Skizze15 → Schnitt-Linear austragen8 (cut, up to next)
    with BuildSketch(Plane(origin=(0, 0, -29), x_dir=(-1, 0, 0), z_dir=(0, 0, -1)), mode=Mode.PRIVATE) as schnitt_linear_austragen8_sk7:
        with BuildLine():
            Line((-31.5, 9), (-30.5, 9))
            ThreePointArc((-30.5, 9), (-31, 8.5), (-31.5, 9))
        make_face()
    schnitt_linear_austragen8_tool7 = extrude(schnitt_linear_austragen8_sk7.sketch, amount=-SCHNITT_LINEAR_AUSTRAGEN8_REACH, mode=Mode.PRIVATE) & part.part
    # Skizze15 → Schnitt-Linear austragen8 (cut, up to next)
    with BuildSketch(Plane(origin=(0, 0, -29), x_dir=(-1, 0, 0), z_dir=(0, 0, -1)), mode=Mode.PRIVATE) as schnitt_linear_austragen8_sk8:
        with BuildLine():
            Line((-22.5, 9), (-21.5, 9))
            ThreePointArc((-21.5, 9), (-22, 8.5), (-22.5, 9))
        make_face()
    schnitt_linear_austragen8_tool8 = extrude(schnitt_linear_austragen8_sk8.sketch, amount=-SCHNITT_LINEAR_AUSTRAGEN8_REACH, mode=Mode.PRIVATE) & part.part
    # Skizze15 → Schnitt-Linear austragen8 (cut, up to next)
    with BuildSketch(Plane(origin=(0, 0, -29), x_dir=(-1, 0, 0), z_dir=(0, 0, -1)), mode=Mode.PRIVATE) as schnitt_linear_austragen8_sk9:
        with BuildLine():
            Line((-13.5, 9), (-12.5, 9))
            ThreePointArc((-12.5, 9), (-13, 8.5), (-13.5, 9))
        make_face()
    schnitt_linear_austragen8_tool9 = extrude(schnitt_linear_austragen8_sk9.sketch, amount=-SCHNITT_LINEAR_AUSTRAGEN8_REACH, mode=Mode.PRIVATE) & part.part
    add(schnitt_linear_austragen8_tool1.solids().sort_by_distance((87, 8.787793, -29))[0], mode=Mode.SUBTRACT)
    add(schnitt_linear_austragen8_tool2.solids().sort_by_distance((78, 8.787793, -29))[0], mode=Mode.SUBTRACT)
    add(schnitt_linear_austragen8_tool3.solids().sort_by_distance((69, 8.787793, -29))[0], mode=Mode.SUBTRACT)
    add(schnitt_linear_austragen8_tool4.solids().sort_by_distance((59, 8.787793, -29))[0], mode=Mode.SUBTRACT)
    add(schnitt_linear_austragen8_tool5.solids().sort_by_distance((50, 8.787793, -29))[0], mode=Mode.SUBTRACT)
    add(schnitt_linear_austragen8_tool6.solids().sort_by_distance((41, 8.787793, -29))[0], mode=Mode.SUBTRACT)
    add(schnitt_linear_austragen8_tool7.solids().sort_by_distance((31, 8.787793, -29))[0], mode=Mode.SUBTRACT)
    add(schnitt_linear_austragen8_tool8.solids().sort_by_distance((22, 8.787793, -29))[0], mode=Mode.SUBTRACT)
    add(schnitt_linear_austragen8_tool9.solids().sort_by_distance((13, 8.787793, -29))[0], mode=Mode.SUBTRACT)

    # Durchgangsloch für M31 (through all)
    with Locations(Plane(origin=(0, 9, 0), x_dir=(1, 0, 0), z_dir=(0, 1, 0))):
        with Locations((26, 24), (73, 19), (93, 24), (94.5, 3), (12, 7), (5, 24), (37, 3)):
            Hole(DURCHGANGSLOCH_F_R_M31_D / 2)

    # M3 Gewindebohrung1 (through all)
    with Locations(Plane(origin=(0, 9, 0), x_dir=(1, 0, 0), z_dir=(0, 1, 0))):
        with Locations((36, 19), (64, 13)):
            Hole(M3_GEWINDEBOHRUNG1_D / 2)

    # Skizze10 → Aufsatz-Linear austragen2 (add)
    with BuildSketch(Plane(origin=(0, 9, 0), x_dir=(1, 0, 0), z_dir=(0, 1, 0))):
        with Locations(Location((93, 14.5, 0), (0, 0, 90))):
            Circle(SKIZZE10_R)
        with Locations(Location((5, 14.5, 0), (0, 0, 90))):
            Circle(SKIZZE10_R)
    extrude(amount=AUFSATZ_LINEAR_AUSTRAGEN2_DEPTH)


solid = part.part
